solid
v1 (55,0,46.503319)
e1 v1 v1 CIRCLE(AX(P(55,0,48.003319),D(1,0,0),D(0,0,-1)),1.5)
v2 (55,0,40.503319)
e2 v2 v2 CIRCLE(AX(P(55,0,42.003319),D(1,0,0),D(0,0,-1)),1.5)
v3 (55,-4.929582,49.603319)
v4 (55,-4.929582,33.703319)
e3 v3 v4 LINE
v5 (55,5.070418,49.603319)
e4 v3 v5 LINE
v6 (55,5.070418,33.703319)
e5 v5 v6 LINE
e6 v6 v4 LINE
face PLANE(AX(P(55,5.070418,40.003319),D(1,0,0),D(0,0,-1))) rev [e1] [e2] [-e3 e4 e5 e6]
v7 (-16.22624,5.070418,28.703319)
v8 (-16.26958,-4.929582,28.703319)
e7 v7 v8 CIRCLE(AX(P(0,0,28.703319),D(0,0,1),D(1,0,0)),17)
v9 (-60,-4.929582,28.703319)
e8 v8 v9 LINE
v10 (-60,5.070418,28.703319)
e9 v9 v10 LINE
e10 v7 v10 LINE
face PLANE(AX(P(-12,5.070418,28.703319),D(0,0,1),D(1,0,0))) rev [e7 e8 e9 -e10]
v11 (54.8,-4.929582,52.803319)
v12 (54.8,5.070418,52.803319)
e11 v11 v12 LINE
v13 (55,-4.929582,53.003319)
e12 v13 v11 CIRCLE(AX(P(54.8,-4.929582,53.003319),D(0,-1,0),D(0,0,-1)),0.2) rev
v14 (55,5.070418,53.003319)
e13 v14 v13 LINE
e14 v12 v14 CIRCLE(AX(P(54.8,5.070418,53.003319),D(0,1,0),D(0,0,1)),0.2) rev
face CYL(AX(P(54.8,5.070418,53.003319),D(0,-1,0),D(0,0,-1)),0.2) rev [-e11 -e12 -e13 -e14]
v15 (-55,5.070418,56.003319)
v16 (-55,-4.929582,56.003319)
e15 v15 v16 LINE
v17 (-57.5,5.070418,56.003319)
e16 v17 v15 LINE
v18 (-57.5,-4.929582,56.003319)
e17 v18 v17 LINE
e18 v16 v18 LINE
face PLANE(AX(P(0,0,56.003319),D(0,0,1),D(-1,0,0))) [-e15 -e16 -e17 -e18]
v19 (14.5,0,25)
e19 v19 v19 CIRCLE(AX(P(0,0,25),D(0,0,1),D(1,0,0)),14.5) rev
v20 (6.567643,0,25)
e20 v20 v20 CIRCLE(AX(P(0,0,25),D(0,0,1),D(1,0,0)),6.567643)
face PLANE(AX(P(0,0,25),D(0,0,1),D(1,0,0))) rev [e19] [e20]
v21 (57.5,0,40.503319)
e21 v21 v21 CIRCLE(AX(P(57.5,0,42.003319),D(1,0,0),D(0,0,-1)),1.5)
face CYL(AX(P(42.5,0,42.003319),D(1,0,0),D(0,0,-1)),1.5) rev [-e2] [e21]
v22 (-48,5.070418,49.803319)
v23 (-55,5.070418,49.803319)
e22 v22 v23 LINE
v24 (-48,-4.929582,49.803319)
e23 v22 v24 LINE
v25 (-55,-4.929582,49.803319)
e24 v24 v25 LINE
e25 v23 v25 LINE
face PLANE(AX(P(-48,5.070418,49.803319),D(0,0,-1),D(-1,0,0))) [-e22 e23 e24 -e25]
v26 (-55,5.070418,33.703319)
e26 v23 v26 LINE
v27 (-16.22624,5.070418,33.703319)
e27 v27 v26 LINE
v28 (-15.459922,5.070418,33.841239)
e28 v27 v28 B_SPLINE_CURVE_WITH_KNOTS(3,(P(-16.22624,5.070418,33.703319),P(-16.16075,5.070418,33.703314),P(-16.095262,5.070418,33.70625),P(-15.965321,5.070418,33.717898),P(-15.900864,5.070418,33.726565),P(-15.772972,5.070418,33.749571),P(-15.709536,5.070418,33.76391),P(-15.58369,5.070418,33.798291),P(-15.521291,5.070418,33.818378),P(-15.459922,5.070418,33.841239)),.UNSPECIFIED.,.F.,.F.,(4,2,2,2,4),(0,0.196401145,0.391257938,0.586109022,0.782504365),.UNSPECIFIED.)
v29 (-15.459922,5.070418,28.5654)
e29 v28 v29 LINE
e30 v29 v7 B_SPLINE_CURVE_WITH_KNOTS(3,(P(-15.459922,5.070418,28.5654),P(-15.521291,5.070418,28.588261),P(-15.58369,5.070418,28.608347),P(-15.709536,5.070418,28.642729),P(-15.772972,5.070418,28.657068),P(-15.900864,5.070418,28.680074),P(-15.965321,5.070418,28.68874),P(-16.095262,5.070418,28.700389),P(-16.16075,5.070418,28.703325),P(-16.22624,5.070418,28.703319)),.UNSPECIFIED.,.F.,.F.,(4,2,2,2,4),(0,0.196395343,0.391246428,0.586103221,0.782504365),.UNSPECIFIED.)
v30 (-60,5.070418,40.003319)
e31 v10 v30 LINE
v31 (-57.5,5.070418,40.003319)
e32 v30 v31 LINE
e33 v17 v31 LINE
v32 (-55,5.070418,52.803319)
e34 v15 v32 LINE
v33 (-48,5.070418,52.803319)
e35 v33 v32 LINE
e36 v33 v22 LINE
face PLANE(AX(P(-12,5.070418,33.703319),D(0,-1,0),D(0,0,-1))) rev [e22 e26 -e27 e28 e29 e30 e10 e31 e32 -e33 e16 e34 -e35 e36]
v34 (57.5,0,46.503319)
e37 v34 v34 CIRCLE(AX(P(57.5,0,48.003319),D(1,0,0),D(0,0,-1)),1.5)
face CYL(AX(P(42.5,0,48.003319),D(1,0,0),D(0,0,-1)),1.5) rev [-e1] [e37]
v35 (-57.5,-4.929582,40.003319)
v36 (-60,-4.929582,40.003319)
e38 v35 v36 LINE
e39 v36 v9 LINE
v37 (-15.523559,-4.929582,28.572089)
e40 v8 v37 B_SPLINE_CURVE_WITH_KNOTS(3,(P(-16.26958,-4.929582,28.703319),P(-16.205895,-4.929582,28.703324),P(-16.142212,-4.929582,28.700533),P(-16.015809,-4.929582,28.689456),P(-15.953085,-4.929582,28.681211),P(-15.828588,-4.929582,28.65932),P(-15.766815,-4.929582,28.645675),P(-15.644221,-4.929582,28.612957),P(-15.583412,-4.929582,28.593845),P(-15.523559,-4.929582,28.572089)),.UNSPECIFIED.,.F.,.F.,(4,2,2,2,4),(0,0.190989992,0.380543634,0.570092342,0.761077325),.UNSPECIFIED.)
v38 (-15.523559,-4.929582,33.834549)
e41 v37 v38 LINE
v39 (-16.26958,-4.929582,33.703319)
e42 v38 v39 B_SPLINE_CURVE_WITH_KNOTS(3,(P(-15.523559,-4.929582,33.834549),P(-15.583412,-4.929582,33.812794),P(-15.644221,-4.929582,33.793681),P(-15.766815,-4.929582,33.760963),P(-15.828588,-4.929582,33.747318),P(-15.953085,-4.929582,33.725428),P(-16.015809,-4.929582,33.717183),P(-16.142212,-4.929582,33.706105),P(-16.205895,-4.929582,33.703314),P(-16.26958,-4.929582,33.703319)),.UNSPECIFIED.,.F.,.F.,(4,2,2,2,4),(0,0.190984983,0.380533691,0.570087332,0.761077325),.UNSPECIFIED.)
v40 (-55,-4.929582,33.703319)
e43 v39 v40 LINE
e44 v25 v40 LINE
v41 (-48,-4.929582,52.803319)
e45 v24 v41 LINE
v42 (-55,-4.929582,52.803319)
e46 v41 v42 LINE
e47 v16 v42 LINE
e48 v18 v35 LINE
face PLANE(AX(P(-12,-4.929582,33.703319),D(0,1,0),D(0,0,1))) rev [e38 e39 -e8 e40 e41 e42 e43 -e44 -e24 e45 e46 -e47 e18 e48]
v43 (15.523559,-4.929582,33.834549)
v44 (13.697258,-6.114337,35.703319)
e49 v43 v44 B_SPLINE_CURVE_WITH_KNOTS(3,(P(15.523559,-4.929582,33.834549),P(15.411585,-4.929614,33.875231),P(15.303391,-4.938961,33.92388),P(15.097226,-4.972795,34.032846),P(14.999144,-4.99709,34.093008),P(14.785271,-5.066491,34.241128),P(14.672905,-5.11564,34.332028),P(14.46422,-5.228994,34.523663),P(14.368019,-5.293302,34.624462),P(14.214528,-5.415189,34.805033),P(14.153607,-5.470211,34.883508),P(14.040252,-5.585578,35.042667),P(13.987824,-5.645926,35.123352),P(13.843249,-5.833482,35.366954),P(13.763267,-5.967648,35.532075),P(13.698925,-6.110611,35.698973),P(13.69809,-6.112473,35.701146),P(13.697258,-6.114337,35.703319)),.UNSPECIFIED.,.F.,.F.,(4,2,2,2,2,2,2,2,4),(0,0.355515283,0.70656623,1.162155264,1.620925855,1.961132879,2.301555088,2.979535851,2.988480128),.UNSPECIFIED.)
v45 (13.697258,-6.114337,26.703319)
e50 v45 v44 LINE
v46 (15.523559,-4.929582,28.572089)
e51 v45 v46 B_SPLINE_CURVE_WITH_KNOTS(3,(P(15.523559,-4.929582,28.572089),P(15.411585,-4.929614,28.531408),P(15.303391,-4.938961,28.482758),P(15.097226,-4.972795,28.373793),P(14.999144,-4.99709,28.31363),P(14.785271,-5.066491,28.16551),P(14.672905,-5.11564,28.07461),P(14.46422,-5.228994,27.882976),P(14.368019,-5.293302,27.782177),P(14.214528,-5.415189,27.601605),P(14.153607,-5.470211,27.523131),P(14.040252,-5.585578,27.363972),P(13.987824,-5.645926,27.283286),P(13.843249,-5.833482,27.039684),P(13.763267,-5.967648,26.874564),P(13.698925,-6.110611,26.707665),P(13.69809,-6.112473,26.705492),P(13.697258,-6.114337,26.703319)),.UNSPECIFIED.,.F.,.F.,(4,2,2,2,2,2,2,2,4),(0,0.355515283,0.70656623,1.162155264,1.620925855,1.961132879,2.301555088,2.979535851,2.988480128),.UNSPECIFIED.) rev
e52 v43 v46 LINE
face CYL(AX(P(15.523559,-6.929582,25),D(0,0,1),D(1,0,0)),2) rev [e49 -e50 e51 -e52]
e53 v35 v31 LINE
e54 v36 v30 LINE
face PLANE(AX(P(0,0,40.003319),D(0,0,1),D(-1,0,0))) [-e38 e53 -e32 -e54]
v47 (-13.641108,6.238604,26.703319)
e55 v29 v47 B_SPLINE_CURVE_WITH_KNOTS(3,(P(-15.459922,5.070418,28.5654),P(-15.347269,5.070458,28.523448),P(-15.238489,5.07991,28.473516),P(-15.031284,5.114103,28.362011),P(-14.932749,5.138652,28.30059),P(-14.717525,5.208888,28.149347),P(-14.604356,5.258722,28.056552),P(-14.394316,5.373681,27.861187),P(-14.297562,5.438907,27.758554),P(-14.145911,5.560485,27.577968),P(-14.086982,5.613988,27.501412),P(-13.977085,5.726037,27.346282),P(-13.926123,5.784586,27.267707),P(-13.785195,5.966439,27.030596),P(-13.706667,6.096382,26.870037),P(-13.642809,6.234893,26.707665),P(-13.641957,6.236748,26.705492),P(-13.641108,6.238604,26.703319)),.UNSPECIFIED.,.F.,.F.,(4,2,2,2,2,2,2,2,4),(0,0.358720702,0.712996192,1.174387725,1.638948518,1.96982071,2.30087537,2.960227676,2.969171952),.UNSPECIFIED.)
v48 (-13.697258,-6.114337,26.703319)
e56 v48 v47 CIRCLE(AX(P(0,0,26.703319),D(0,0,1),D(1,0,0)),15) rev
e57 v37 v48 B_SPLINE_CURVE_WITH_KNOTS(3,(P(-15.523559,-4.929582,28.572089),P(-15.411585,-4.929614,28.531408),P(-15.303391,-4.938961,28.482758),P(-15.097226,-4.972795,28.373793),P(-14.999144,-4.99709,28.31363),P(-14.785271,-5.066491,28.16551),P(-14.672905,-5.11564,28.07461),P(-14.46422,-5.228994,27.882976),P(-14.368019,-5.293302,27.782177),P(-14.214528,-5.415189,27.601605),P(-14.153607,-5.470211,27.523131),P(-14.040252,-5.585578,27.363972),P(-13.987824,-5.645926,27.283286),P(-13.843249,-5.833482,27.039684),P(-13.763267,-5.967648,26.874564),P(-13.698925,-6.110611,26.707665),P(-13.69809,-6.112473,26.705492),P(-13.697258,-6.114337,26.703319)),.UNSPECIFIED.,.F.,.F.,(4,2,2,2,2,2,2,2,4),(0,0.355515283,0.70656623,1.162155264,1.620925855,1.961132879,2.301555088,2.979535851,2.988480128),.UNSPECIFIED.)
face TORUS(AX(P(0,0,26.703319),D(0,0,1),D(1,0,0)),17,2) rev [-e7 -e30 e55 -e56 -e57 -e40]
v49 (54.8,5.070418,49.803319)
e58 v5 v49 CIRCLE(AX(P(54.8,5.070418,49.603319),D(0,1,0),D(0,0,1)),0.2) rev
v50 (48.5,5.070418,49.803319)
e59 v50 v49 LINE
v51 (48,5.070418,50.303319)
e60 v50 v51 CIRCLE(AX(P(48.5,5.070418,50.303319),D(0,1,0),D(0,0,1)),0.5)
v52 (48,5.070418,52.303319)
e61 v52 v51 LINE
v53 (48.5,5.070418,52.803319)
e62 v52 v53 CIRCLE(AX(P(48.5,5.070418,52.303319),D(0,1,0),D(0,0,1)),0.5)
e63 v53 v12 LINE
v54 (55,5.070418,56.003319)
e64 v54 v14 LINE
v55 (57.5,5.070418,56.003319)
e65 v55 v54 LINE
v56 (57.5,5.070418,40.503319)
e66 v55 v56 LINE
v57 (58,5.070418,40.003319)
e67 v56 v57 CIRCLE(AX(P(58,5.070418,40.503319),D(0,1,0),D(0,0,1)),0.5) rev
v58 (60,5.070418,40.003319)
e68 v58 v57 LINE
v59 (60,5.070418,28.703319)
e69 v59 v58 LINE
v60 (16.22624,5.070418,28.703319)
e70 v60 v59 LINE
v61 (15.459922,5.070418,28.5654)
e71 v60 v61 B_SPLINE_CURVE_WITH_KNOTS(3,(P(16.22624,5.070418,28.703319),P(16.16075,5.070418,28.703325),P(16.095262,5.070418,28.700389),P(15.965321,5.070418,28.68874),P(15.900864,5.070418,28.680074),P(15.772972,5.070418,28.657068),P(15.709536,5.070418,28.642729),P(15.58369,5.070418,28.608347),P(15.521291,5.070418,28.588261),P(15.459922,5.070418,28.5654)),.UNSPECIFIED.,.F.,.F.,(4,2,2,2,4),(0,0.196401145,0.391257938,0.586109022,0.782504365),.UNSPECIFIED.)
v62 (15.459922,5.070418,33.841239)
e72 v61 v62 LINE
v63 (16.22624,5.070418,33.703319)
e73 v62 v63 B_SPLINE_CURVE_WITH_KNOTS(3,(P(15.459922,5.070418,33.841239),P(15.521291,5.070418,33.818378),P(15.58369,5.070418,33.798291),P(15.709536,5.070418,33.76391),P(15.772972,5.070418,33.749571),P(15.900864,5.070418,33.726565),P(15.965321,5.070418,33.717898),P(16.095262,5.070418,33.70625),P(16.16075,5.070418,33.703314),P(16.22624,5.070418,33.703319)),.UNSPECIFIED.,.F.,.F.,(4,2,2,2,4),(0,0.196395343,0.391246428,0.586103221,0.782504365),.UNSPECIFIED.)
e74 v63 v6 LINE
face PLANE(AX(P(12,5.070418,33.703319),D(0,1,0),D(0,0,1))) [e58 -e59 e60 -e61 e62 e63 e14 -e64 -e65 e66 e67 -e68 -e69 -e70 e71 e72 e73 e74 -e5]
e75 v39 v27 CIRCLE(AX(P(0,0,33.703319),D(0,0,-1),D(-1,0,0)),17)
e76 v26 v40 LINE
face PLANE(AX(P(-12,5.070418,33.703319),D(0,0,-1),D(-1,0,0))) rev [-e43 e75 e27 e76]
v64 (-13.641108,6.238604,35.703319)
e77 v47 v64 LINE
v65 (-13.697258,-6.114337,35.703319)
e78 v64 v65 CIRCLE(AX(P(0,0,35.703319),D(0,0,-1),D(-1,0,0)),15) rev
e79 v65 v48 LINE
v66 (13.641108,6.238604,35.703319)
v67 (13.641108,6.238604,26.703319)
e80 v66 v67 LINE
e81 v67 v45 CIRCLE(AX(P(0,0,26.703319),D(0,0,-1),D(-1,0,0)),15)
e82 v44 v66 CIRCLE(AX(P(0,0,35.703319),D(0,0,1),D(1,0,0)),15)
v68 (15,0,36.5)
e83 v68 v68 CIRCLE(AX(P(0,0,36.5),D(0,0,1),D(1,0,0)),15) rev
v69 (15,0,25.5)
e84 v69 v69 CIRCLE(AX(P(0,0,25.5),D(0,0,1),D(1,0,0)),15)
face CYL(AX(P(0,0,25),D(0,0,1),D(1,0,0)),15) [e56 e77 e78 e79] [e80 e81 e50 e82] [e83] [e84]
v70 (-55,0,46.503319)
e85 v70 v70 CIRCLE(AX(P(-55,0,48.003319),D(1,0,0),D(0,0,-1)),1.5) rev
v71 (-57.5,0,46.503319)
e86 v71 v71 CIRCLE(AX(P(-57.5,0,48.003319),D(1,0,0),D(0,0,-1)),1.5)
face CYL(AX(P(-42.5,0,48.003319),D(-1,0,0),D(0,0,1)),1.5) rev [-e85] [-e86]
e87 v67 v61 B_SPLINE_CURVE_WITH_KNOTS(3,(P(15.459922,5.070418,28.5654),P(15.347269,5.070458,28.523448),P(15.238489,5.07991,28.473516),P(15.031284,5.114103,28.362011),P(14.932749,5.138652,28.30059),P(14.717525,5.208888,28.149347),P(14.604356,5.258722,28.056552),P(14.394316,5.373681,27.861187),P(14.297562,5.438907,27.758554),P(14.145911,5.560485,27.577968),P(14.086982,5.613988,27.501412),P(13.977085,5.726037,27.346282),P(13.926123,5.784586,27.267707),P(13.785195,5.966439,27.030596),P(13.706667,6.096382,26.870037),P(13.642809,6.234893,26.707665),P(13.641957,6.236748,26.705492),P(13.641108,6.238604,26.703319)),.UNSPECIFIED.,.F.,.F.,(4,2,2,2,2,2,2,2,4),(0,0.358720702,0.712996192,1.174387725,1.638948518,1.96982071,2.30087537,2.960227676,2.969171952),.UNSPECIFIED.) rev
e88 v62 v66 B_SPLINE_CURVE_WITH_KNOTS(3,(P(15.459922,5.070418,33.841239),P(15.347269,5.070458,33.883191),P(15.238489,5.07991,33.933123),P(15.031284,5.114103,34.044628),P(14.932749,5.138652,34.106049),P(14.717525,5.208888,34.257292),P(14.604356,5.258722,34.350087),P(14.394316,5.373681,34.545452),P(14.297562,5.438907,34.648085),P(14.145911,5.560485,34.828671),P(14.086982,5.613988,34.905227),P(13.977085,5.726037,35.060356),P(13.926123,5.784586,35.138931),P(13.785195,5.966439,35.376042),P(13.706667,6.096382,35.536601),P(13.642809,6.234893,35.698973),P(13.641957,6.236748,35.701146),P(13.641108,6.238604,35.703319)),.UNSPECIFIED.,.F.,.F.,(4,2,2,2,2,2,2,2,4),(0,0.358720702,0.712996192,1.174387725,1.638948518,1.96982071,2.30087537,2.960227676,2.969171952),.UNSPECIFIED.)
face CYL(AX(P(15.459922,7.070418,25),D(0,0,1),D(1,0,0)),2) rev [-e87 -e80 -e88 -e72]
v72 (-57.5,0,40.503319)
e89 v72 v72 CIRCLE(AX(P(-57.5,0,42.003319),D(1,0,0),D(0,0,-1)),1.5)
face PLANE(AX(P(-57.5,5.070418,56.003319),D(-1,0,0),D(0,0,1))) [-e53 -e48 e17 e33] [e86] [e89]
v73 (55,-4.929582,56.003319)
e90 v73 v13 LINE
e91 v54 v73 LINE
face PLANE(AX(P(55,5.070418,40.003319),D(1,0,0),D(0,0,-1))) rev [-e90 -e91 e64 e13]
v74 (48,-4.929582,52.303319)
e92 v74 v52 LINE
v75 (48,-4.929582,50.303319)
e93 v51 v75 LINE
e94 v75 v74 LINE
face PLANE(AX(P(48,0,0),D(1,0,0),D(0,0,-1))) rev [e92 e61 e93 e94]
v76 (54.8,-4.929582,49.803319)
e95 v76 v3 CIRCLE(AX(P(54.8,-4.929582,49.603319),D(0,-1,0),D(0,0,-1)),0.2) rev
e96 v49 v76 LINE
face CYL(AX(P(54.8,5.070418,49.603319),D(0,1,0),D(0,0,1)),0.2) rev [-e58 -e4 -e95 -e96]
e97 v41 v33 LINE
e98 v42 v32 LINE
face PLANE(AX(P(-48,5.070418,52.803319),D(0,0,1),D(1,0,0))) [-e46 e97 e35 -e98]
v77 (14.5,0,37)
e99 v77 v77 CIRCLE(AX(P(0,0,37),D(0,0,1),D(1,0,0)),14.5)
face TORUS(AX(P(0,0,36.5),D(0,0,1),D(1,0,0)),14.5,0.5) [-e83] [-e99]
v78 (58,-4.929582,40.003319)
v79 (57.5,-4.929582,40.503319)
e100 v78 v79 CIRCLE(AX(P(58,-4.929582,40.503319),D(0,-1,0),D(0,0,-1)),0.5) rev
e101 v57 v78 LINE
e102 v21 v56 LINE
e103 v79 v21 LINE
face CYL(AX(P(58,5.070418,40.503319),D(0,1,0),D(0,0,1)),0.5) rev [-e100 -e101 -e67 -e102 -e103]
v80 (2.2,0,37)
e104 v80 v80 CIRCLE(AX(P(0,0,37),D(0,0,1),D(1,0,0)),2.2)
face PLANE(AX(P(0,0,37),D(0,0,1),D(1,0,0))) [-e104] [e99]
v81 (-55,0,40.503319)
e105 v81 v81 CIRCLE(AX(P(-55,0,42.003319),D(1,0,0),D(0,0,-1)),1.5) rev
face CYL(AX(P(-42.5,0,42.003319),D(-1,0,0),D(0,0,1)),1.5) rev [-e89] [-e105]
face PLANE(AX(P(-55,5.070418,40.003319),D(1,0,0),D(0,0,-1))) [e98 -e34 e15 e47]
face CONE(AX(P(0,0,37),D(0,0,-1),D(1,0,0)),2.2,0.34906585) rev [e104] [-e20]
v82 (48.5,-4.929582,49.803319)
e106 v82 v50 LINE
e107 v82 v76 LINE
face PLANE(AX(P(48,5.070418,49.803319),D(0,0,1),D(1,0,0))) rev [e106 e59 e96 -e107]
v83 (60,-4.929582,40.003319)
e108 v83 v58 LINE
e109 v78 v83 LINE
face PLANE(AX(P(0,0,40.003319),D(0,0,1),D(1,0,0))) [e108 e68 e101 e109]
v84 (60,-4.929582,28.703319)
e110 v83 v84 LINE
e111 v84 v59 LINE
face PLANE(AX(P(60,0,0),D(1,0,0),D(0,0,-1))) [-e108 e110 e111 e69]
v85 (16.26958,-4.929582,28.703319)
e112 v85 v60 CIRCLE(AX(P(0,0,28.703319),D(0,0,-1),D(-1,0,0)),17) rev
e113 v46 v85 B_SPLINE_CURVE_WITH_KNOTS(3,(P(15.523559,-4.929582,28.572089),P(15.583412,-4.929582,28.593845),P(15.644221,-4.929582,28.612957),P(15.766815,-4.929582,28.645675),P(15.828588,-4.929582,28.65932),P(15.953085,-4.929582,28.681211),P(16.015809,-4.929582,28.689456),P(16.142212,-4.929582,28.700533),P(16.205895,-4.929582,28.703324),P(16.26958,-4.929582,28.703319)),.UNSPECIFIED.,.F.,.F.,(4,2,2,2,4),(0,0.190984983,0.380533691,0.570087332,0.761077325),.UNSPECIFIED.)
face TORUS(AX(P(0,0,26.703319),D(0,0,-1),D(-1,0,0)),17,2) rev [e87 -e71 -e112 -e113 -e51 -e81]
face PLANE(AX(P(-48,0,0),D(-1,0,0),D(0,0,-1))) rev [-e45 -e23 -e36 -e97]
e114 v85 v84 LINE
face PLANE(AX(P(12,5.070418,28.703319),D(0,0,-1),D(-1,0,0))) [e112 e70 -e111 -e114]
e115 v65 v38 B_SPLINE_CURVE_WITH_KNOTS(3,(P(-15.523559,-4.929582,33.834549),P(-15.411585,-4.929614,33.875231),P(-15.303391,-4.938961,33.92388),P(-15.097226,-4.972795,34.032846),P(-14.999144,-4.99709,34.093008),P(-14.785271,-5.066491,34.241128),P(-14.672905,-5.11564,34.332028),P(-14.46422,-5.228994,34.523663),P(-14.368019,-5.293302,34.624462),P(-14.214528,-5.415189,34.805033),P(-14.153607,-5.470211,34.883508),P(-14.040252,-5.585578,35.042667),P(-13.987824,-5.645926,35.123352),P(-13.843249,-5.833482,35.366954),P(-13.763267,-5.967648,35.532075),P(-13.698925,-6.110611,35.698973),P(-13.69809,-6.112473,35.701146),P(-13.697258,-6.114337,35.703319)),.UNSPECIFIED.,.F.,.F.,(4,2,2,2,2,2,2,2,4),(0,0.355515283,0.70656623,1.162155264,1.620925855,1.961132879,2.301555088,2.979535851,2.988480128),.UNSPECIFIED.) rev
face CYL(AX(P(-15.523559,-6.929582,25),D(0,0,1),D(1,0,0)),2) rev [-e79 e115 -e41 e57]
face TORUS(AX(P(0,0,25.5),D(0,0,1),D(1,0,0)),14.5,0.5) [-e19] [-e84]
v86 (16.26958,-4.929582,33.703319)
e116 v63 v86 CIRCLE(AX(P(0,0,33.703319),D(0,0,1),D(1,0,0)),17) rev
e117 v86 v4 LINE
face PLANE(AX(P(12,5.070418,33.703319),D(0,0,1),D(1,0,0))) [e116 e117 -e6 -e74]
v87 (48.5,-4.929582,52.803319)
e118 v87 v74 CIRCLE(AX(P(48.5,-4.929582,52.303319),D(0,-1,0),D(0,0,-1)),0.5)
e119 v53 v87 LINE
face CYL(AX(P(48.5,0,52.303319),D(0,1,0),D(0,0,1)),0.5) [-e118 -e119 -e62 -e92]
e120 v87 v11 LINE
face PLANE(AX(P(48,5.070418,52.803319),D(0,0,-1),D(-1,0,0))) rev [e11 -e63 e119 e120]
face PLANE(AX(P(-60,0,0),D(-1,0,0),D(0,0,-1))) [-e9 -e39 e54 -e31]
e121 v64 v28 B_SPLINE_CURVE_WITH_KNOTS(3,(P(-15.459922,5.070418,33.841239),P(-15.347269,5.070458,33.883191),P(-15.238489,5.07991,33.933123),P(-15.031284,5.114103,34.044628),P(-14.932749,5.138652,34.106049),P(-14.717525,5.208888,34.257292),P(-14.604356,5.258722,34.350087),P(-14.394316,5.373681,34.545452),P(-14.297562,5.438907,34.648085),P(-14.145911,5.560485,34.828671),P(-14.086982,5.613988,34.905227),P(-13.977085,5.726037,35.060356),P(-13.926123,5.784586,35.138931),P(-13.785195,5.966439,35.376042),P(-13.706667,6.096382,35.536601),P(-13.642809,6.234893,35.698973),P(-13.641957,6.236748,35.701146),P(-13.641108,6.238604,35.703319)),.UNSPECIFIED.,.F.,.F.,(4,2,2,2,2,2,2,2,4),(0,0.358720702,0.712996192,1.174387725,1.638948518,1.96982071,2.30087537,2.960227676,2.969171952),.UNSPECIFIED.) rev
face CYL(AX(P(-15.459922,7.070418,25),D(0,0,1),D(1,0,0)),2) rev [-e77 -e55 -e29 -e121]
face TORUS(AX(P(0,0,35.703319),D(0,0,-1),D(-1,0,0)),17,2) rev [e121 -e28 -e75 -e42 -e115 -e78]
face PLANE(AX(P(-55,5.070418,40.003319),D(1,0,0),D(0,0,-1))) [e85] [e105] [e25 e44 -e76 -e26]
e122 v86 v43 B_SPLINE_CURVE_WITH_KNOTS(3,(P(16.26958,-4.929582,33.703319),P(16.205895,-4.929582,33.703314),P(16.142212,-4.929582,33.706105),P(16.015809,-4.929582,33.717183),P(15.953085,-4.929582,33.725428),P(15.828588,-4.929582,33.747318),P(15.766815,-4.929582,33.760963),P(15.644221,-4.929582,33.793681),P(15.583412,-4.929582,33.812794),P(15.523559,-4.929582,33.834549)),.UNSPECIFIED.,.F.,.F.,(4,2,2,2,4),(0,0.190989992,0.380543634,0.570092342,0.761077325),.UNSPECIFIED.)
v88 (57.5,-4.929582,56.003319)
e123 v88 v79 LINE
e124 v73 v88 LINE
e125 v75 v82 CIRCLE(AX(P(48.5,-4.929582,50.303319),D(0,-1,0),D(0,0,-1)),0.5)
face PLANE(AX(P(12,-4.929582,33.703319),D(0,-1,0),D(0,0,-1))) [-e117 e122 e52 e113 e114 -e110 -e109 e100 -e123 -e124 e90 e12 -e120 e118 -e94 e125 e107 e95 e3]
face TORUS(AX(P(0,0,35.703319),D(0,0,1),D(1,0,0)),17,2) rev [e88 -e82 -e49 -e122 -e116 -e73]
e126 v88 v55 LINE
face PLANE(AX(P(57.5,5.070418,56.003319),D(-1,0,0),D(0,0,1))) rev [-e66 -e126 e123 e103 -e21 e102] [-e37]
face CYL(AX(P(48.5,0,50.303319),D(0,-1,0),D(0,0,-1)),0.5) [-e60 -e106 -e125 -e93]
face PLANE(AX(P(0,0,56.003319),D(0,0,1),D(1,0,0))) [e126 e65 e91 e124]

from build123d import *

# Parameters (mm, degrees)
SKETCH7_R            = 15
BOSS_EXTRUDE2_DEPTH  = 12
SKETCH8_R            = 2.2
CUT_EXTRUDE2_DEPTH   = 20
CUT_EXTRUDE2_DRAFT   = 20
BOSS_EXTRUDE4_START  = -3
SKETCH11_W           = 5
SKETCH11_H           = 10
BOSS_EXTRUDE4_DEPTH  = 48
SKETCH14_W           = 5
SKETCH14_H           = 10
BOSS_EXTRUDE5_DEPTH  = 6.3
SKETCH17_W           = 2.5
SKETCH17_H           = 10
BOSS_EXTRUDE8_DEPTH  = 16
SKETCH20_R           = 1.5
CUT_EXTRUDE3_DEPTH   = 15
FILLET2_R            = 2
FILLET7_R            = 0.5
FILLET8_R            = 0.5
SKETCH24_W           = 3
SKETCH24_H           = 10
BOSS_EXTRUDE11_DEPTH = 7
FILLET2_OF_MIRROR5_R = 2
FILLET9_R            = 0.2
FILLET10_START       = -6
FILLET10_DEPTH       = 12
FILLET10_START_2     = -4.929582237
FILLET10_2_DEPTH     = 10
FILLET11_R           = 0.5


with BuildPart() as part:
    # Sketch7 → Boss-Extrude2 (new body)
    with BuildSketch(Plane.XY.offset(37)):
        Circle(SKETCH7_R)
    extrude(amount=-BOSS_EXTRUDE2_DEPTH)


with BuildPart() as cut_extrude2_tool:
    # Sketch8 → Cut-Extrude2 (with draft: the straight prism first)
    with BuildSketch(Plane.XY.offset(37)):
        Circle(SKETCH8_R)
    extrude(amount=-CUT_EXTRUDE2_DEPTH)
    # Cut-Extrude2: the draft: its side faces are tilted about the plane it starts from
    cut_extrude2_sides = [cut_extrude2_tool.faces().sort_by_distance(p)[0] for p in [
        (-2.2, 0, 27),
    ]]
    draft(cut_extrude2_sides, Plane.XY.offset(37), CUT_EXTRUDE2_DRAFT)


with BuildPart() as part_1:
    add(part.part)

    # Cut-Extrude2: cut by cut_extrude2_tool
    add(cut_extrude2_tool.part, mode=Mode.SUBTRACT)

    # Sketch11 → Boss-Extrude4 (add)
    with BuildSketch(Plane(origin=(15, 0, 0), x_dir=(0, 0, -1), z_dir=(1, 0, 0)).offset(BOSS_EXTRUDE4_START)):
        with Locations((-31.203319291, 0.070417763)):
            Rectangle(SKETCH11_W, SKETCH11_H)
    boss_extrude4 = extrude(amount=BOSS_EXTRUDE4_DEPTH)

    # Sketch14 → Boss-Extrude5 (add)
    with BuildSketch(Plane.XY.offset(33.703319291)):
        with Locations((57.5, 0.070417763)):
            Rectangle(SKETCH14_W, SKETCH14_H)
    boss_extrude5 = extrude(amount=BOSS_EXTRUDE5_DEPTH)

    # Sketch17 → Boss-Extrude8 (add)
    with BuildSketch(Plane.XY.offset(40.003319291)):
        with Locations((56.25, 0.070417763)):
            Rectangle(SKETCH17_W, SKETCH17_H)
    boss_extrude8 = extrude(amount=BOSS_EXTRUDE8_DEPTH)

    # Sketch20 → Cut-Extrude3 (cut)
    with BuildSketch(Plane(origin=(57.5, 0, 0), x_dir=(0, 0, -1), z_dir=(1, 0, 0))):
        with Locations((-42.003319291, 0)):
            Circle(SKETCH20_R)
        with Locations((-48.003319291, 0)):
            Circle(SKETCH20_R)
    cut_extrude3 = extrude(amount=-CUT_EXTRUDE3_DEPTH, mode=Mode.SUBTRACT)

    # Fillet2
    fillet2_edges = [part_1.edges().sort_by_distance(p)[0] for p in [
        (14.166835178, -4.929582237, 31.203319291),
        (14.777611852, 2.573361217, 28.703319291),
        (14.117041606, 5.070417763, 31.203319291),
        (14.777611852, 2.573361217, 33.703319291),
    ]]
    fillet(fillet2_edges, radius=FILLET2_R)

    # Fillet7
    fillet7_edges = [part_1.edges().sort_by_distance(p)[0] for p in [
        (-15, 0, 37),
    ]]
    fillet(fillet7_edges, radius=FILLET7_R)

    # Fillet8
    fillet8_edges = [part_1.edges().sort_by_distance(p)[0] for p in [
        (-15, 0, 25),
    ]]
    fillet(fillet8_edges, radius=FILLET8_R)

    # Sketch24 → Boss-Extrude11 (add)
    with BuildSketch(Plane.ZY.offset(-55)):
        with Locations((51.303319291, 0.070417763)):
            Rectangle(SKETCH24_W, SKETCH24_H)
    boss_extrude11 = extrude(amount=BOSS_EXTRUDE11_DEPTH)

    # Mirror5: Boss-Extrude4, Boss-Extrude5, Boss-Extrude8, Cut-Extrude3, Boss-Extrude11 across plane
    add(boss_extrude4.mirror(Plane(origin=(0, 0, 0), x_dir=(0, 0, 1), z_dir=(1, 0, 0))))
    add(boss_extrude5.mirror(Plane(origin=(0, 0, 0), x_dir=(0, 0, 1), z_dir=(1, 0, 0))))
    add(boss_extrude8.mirror(Plane(origin=(0, 0, 0), x_dir=(0, 0, 1), z_dir=(1, 0, 0))))
    add(cut_extrude3.mirror(Plane(origin=(0, 0, 0), x_dir=(0, 0, 1), z_dir=(1, 0, 0))), mode=Mode.SUBTRACT)
    add(boss_extrude11.mirror(Plane(origin=(0, 0, 0), x_dir=(0, 0, 1), z_dir=(1, 0, 0))))

    # Fillet2 of Mirror5
    fillet2_of_mirror5_edges = [part_1.edges().sort_by_distance(p)[0] for p in [
        (-14.166835178, -4.929582237, 31.203319291),
        (-14.777611852, 2.573361217, 28.703319291),
        (-14.117041606, 5.070417763, 31.203319291),
        (-14.777611852, 2.573361217, 33.703319291),
    ]]
    fillet(fillet2_of_mirror5_edges, radius=FILLET2_OF_MIRROR5_R)

    # Fillet9
    fillet9_edges = [part_1.edges().sort_by_distance(p)[0] for p in [
        (55, 0.070417763, 52.803319291),
        (55, 0.070417763, 49.803319291),
    ]]
    fillet(fillet9_edges, radius=FILLET9_R)

    # Fillet10: read off the stored shape, not the designer's step
    # Fillet10 outline → Fillet10 (cut)
    with BuildSketch(Plane(origin=(0, 0, 0), x_dir=(1, 0, 0), z_dir=(0, 1, 0)).offset(FILLET10_START)):
        with BuildLine():
            Line((48, -49.803319291), (48, -50.303319291))
            ThreePointArc((48, -50.303319291), (48.14644661, -49.949765901), (48.5, -49.803319291))
            Line((48.5, -49.803319291), (48, -49.803319291))
        make_face()
    extrude(amount=FILLET10_DEPTH, mode=Mode.SUBTRACT)

    # Fillet10 2 outline → Fillet10 2 (add)
    with BuildSketch(Plane(origin=(0, 0, 0), x_dir=(1, 0, 0), z_dir=(0, 1, 0)).offset(FILLET10_START_2)):
        with BuildLine():
            ThreePointArc((57.5, -40.503319291), (57.64644661, -40.149765901), (58, -40.003319291))
            Line((58, -40.003319291), (57.5, -40.003319291))
            Line((57.5, -40.003319291), (57.5, -40.503319291))
        make_face()
    extrude(amount=FILLET10_2_DEPTH)

    # Fillet11
    fillet11_edges = [part_1.edges().sort_by_distance(p)[0] for p in [
        (48, 0.070417763, 52.803319291),
    ]]
    fillet(fillet11_edges, radius=FILLET11_R)


solid = part_1.part
